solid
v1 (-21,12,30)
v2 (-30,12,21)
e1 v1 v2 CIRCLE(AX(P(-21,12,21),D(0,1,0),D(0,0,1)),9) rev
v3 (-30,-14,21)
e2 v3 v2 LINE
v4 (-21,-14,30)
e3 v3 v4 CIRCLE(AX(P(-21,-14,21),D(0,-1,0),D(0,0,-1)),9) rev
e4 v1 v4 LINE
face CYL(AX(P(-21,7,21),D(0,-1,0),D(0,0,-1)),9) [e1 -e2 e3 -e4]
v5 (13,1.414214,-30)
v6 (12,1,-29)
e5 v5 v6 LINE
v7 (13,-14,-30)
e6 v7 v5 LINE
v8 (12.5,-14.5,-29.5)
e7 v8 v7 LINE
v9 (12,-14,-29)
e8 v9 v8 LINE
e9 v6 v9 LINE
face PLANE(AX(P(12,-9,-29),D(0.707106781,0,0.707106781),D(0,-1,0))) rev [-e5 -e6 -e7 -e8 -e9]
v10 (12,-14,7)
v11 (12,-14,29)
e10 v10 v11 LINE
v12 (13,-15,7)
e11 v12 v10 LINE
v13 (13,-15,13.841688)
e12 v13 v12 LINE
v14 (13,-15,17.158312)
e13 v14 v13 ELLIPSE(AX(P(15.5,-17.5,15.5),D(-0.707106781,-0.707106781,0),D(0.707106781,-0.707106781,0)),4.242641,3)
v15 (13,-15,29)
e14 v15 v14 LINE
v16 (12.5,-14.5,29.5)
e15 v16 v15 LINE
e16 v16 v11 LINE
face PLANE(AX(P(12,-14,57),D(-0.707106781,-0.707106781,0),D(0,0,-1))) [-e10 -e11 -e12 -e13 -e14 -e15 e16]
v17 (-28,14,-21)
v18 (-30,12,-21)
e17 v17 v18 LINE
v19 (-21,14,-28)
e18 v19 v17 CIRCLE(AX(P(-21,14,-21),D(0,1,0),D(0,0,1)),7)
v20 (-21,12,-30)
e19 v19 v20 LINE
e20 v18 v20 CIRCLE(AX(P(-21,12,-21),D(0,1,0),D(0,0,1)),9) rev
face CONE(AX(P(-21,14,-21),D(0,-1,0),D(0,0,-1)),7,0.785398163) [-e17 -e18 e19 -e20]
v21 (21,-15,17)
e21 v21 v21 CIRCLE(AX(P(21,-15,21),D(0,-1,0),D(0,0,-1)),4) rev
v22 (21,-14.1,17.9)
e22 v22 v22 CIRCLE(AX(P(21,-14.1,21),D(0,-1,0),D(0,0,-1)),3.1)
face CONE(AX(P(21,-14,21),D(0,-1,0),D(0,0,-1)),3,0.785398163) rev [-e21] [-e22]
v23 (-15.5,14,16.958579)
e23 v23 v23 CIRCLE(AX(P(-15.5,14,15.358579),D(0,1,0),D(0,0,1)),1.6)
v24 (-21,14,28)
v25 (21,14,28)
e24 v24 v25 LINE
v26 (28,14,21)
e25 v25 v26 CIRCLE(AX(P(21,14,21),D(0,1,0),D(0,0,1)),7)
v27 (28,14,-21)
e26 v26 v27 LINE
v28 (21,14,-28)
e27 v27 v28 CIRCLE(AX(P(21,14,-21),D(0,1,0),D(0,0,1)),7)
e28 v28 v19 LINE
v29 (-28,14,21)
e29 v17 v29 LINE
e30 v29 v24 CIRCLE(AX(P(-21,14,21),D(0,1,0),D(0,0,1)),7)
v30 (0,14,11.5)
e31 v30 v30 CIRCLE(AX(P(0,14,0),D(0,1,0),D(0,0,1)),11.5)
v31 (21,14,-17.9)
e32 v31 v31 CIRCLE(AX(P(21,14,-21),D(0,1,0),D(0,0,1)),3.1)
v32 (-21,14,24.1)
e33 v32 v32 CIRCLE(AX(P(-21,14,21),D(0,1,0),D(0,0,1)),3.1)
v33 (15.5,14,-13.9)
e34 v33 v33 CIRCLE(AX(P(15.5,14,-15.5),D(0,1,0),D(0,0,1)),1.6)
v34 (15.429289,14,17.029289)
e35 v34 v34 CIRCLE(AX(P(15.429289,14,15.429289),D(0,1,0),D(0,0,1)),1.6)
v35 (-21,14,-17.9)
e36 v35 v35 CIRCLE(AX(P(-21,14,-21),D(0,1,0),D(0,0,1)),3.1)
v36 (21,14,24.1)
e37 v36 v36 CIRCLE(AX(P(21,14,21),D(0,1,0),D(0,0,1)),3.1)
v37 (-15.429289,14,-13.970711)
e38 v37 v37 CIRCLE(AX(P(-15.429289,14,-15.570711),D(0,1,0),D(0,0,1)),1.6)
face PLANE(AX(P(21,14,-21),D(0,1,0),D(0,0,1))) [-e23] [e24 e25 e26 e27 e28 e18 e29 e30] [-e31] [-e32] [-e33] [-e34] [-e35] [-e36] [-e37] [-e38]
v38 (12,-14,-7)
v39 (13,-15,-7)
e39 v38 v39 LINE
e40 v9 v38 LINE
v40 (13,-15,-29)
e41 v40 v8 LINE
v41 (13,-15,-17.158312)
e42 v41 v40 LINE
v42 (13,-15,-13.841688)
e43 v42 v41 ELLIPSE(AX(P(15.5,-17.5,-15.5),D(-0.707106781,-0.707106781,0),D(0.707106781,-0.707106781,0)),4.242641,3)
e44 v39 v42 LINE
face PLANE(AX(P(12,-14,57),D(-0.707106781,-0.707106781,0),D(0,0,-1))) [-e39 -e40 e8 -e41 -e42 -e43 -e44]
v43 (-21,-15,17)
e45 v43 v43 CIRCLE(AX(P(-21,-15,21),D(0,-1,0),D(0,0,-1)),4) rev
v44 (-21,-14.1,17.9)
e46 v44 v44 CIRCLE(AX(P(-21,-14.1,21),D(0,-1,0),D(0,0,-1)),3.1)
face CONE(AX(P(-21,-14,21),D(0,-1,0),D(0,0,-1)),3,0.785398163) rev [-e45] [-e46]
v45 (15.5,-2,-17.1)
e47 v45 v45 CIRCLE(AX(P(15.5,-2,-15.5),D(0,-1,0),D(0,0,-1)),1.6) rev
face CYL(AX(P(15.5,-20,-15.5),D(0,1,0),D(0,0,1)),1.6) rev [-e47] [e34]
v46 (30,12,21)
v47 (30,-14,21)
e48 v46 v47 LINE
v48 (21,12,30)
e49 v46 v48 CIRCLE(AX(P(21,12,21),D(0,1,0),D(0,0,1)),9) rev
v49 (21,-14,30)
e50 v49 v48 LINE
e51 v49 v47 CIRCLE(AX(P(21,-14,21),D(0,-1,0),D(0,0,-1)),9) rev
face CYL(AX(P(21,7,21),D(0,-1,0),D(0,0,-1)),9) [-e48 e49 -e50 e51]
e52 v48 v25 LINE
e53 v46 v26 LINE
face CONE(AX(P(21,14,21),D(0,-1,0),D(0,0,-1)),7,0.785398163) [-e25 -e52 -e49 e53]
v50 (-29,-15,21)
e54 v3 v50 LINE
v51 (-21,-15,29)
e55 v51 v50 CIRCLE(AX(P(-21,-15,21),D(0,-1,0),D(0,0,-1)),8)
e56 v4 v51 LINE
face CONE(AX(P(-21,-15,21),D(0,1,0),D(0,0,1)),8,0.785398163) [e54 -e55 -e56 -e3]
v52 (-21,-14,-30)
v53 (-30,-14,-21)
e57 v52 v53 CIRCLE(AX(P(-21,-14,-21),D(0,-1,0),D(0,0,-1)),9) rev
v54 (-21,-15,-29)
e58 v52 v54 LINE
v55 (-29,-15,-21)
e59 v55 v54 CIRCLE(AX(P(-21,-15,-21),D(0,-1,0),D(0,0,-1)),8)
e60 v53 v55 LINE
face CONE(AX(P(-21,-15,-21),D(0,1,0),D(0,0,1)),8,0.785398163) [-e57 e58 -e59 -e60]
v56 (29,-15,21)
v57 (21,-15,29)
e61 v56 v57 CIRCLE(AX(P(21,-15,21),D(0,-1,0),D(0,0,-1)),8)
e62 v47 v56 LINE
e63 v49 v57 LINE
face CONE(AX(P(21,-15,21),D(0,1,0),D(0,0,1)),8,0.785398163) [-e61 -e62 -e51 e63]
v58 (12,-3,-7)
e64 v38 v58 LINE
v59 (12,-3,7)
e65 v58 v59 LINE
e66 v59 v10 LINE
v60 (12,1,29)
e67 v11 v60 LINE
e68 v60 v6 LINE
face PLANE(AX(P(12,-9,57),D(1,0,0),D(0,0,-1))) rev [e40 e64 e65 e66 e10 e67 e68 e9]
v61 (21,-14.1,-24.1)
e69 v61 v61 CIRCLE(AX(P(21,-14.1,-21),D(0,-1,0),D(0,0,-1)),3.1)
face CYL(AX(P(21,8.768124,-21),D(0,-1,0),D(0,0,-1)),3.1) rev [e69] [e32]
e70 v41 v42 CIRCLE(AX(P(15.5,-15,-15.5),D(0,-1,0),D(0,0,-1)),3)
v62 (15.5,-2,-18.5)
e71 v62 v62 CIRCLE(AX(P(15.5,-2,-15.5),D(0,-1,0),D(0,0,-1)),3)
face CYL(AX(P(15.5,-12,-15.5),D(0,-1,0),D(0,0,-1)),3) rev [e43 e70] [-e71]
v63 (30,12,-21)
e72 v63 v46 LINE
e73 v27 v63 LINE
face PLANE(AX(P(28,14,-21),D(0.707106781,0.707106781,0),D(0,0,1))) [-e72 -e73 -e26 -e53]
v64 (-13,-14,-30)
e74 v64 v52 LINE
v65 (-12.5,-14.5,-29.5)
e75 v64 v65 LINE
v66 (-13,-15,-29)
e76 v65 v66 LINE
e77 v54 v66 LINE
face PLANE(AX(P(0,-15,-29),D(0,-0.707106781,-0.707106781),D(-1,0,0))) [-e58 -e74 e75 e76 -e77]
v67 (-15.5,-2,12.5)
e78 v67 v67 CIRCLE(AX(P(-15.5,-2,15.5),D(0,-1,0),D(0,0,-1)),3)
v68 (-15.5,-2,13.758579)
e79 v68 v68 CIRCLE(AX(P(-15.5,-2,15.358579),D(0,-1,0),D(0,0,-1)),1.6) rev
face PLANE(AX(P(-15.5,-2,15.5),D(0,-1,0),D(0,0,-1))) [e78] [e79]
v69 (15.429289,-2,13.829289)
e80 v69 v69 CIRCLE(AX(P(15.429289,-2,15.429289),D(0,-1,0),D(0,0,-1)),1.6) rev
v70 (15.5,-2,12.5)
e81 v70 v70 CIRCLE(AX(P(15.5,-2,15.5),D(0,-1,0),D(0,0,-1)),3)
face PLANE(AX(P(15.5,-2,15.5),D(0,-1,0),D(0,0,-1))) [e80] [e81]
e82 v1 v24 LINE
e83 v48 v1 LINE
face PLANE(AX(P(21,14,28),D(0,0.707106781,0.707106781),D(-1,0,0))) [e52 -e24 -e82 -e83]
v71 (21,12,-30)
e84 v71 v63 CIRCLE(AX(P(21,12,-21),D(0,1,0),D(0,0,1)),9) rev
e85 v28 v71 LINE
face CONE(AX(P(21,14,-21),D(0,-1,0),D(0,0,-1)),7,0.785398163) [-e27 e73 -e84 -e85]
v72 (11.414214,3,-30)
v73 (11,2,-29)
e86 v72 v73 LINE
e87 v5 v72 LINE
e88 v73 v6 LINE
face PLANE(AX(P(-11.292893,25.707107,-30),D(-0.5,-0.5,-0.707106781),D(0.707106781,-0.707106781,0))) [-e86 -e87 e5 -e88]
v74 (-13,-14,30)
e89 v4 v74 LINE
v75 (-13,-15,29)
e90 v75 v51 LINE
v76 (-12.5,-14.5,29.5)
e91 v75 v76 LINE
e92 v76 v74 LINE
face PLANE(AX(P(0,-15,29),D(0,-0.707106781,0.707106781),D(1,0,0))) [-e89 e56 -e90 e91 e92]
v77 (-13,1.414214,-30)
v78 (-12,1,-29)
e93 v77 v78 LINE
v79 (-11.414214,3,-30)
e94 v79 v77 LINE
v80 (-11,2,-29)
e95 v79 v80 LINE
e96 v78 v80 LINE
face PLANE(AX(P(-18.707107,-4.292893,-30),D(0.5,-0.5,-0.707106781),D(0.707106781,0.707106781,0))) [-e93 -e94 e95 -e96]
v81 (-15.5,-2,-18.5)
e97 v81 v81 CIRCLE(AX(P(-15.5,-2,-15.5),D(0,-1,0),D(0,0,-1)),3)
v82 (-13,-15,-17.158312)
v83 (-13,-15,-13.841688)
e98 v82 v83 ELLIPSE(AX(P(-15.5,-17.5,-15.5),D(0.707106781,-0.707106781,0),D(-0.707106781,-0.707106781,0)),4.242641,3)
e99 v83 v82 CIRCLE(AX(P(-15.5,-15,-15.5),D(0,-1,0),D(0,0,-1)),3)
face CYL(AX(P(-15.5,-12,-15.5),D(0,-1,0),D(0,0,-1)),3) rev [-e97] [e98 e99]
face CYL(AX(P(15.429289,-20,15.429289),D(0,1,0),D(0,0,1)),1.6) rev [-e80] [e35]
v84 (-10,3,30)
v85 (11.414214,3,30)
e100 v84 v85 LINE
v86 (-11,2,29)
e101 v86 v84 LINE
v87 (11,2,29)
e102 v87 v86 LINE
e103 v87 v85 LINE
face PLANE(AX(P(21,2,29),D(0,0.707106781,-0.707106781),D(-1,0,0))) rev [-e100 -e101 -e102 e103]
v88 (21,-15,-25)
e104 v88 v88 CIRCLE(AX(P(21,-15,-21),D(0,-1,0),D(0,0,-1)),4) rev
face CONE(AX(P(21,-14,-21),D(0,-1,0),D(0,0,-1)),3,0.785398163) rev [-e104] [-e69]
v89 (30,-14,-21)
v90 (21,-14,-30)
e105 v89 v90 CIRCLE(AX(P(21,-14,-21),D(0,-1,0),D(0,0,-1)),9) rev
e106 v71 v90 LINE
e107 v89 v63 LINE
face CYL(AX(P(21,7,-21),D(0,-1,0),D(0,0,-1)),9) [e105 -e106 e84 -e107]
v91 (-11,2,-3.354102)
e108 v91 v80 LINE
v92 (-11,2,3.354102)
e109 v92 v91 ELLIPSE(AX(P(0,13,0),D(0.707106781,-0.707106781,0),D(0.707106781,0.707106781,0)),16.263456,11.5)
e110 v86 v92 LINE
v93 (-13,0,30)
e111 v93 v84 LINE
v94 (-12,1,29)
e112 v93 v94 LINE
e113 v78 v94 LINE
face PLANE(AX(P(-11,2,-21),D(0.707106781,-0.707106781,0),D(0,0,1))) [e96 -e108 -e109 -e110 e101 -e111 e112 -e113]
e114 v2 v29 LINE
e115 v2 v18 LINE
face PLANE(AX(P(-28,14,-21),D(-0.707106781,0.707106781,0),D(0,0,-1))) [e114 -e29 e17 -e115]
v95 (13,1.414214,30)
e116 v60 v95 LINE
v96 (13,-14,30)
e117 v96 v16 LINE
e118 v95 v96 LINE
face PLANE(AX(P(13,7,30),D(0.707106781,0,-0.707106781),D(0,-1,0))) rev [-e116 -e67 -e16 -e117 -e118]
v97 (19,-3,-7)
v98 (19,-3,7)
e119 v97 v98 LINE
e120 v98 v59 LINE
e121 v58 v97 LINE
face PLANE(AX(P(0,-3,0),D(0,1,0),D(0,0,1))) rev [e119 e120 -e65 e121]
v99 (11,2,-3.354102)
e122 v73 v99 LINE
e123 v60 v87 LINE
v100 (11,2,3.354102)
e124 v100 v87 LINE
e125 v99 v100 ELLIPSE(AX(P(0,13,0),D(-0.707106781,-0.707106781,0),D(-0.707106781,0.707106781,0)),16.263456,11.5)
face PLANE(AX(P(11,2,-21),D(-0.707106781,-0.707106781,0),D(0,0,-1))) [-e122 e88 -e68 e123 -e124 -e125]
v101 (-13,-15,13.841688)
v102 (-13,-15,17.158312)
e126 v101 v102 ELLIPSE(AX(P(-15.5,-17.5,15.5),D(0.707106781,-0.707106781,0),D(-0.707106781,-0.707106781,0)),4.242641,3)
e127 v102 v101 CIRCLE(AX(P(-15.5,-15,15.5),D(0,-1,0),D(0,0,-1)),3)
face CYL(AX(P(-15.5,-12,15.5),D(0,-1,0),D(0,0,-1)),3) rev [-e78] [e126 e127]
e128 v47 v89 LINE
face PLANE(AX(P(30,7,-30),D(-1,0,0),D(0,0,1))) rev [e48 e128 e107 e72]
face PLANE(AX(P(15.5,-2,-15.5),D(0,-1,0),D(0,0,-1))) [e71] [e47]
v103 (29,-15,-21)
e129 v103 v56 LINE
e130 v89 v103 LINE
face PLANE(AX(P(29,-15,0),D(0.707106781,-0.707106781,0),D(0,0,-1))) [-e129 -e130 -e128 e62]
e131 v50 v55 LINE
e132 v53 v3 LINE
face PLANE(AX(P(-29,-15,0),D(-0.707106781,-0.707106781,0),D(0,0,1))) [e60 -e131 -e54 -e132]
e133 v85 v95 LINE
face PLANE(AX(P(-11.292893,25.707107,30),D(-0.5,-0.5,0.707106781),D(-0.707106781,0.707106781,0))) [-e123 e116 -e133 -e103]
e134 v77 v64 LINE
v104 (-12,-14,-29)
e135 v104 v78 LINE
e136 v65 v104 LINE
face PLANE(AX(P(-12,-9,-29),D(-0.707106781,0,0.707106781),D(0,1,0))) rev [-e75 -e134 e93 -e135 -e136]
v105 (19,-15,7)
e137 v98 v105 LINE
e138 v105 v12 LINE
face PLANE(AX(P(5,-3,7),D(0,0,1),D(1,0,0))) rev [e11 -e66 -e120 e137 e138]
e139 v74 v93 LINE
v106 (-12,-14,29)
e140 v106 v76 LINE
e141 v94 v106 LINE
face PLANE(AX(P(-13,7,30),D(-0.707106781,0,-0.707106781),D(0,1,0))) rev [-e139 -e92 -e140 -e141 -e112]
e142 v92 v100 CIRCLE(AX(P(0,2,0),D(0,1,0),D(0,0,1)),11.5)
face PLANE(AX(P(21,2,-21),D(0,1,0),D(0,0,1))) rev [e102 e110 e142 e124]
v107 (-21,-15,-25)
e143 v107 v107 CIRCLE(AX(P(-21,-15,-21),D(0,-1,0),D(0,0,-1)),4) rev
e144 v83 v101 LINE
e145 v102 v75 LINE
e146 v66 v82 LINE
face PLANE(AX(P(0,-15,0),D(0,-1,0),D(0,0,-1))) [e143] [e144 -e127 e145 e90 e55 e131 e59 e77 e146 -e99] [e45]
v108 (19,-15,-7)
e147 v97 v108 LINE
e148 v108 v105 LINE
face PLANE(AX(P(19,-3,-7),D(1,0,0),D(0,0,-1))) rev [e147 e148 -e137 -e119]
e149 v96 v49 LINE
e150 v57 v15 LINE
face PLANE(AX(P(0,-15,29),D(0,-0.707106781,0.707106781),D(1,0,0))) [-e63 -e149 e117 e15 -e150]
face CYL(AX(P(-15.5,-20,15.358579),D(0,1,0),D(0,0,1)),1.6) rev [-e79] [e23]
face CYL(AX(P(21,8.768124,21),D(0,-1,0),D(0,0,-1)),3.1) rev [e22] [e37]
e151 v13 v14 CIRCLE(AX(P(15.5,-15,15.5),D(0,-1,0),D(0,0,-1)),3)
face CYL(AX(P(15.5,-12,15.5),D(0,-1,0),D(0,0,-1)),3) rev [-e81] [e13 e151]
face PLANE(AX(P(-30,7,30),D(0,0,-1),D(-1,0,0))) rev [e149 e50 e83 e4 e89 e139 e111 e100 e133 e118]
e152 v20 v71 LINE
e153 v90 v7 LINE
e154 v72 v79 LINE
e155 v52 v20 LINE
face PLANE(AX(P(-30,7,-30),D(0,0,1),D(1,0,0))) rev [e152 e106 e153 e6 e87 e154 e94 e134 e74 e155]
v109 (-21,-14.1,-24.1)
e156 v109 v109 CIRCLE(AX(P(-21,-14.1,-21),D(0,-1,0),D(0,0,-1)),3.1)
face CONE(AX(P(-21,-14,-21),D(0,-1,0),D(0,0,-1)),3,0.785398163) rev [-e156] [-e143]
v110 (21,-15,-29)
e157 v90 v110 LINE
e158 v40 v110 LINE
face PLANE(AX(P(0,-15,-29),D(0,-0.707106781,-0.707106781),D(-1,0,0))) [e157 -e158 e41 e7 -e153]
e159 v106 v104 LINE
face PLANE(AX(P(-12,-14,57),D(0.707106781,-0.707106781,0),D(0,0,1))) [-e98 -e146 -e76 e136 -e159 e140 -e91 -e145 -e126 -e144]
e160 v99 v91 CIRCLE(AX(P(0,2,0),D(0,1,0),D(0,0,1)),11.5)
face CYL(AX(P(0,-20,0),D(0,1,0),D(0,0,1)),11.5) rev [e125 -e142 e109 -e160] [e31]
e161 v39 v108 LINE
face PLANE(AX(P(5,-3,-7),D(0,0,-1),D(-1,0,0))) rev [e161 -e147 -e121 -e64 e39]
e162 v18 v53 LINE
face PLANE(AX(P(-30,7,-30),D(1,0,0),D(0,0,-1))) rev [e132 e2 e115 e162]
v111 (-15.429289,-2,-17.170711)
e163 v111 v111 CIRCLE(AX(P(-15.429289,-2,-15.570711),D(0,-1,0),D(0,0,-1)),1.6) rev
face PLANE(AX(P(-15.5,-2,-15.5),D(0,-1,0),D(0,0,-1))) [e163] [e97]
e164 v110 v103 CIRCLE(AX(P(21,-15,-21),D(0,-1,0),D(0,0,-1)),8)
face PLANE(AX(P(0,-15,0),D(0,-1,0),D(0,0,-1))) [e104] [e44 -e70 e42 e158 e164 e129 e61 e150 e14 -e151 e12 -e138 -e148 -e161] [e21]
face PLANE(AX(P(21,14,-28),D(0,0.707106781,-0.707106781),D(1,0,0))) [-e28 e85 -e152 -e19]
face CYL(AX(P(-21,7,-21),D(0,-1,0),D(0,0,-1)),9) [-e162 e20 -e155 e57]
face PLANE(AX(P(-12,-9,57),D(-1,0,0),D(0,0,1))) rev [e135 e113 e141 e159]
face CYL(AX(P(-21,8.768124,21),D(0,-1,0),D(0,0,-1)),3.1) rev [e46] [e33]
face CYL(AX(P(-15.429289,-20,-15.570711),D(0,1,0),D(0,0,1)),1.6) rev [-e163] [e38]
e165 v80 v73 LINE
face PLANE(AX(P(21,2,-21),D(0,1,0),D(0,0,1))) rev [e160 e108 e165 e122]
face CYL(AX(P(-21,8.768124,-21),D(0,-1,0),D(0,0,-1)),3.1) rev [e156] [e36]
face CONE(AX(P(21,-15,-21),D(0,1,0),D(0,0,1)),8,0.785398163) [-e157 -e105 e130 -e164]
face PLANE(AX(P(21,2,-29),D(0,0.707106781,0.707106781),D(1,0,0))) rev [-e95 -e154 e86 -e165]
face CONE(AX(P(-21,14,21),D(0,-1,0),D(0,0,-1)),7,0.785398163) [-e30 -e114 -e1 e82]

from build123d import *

# Parameters (mm, degrees)
SKETCH_1_W           = 60
SKETCH_1_H           = 60
EXTRUDE_1_DEPTH      = 7
SKETCH_2_W           = 18
SKETCH_2_H           = 60
SKETCH_2_R           = 3
EXTRUDE_2_DEPTH      = 15
SKETCH_3_W           = 43
SKETCH_3_H           = 70
CUT_EXTRUDE_1_DEPTH  = 7
SKETCH_4_W           = 24
SKETCH_4_H           = 60
EXTRUDE_3_DEPTH      = 15
SKETCH_12_W          = 24
SKETCH_12_H          = 12
CUT_EXTRUDE_8_DEPTH  = 87
FILLET_START         = -16
FILLET_8_DEPTH       = 24
CHAMFER_23_SIZE      = 1
CHAMFER_24_SIZE      = 1
EXTRUDE_4_DEPTH      = 7
EXTRUDE_5_DEPTH      = 7
SKETCH_23_W          = 24
SKETCH_23_H          = 60
CUT_EXTRUDE_9_DEPTH  = 11
SKETCH_24_R          = 11.5
SKETCH_24_R_2        = 1.6
CUT_EXTRUDE_10_DEPTH = 34
SKETCH_25_R          = 3
CUT_EXTRUDE_11_DEPTH = 3
CHAMFER_25_SIZE      = 2
CHAMFER_26_SIZE      = 1
CHAMFER_27_SIZE      = 1
CHAMFER_28_SIZE      = 1
SKETCH_26_W          = 14
SKETCH_26_H          = 14
CUT_EXTRUDE_12_DEPTH = 12
SKETCH_28_R          = 3.1
CUT_EXTRUDE_13_DEPTH = 15
SKETCH_30_R          = 3
CUT_EXTRUDE_14_DEPTH = 10
SKETCH_31_R          = 3.1
CUT_EXTRUDE_15_DEPTH = 35


with BuildPart() as part:
    # 草图1 → 凸台-拉伸1 (new body)
    with BuildSketch(Plane(origin=(0, 0, 0), x_dir=(1, 0, 0), z_dir=(0, 1, 0))):
        Rectangle(SKETCH_1_W, SKETCH_1_H)
    extrude(amount=EXTRUDE_1_DEPTH)

    # 草图2 → 凸台-拉伸2 (add)
    # profile 1 of 2: a face of its own
    with BuildSketch(Plane.XZ):
        with Locations((-21, 0)):
            Rectangle(SKETCH_2_W, SKETCH_2_H)
        with Locations(Location((-21, 21, 0), (0, 0, 270))):
            Circle(SKETCH_2_R, mode=Mode.SUBTRACT)
        with Locations(Location((-21, -21, 0), (0, 0, 270))):
            Circle(SKETCH_2_R, mode=Mode.SUBTRACT)
    # profile 2 of 2: a face of its own
    with BuildSketch(Plane.XZ):
        with Locations((21, 0)):
            Rectangle(SKETCH_2_W, SKETCH_2_H)
        with Locations(Location((21, -21, 0), (0, 0, 90))):
            Circle(SKETCH_2_R, mode=Mode.SUBTRACT)
        with Locations(Location((21, 21, 0), (0, 0, 90))):
            Circle(SKETCH_2_R, mode=Mode.SUBTRACT)
    extrude(amount=EXTRUDE_2_DEPTH)

    # 草图3 → 切除-拉伸1 (cut)
    with BuildSketch(Plane(origin=(0, 7, 0), x_dir=(1, 0, 0), z_dir=(0, 1, 0))):
        with Locations((0, 30)):
            Rectangle(SKETCH_3_W, SKETCH_3_H)
    extrude(amount=-CUT_EXTRUDE_1_DEPTH, mode=Mode.SUBTRACT)

    # 草图4 → 凸台-拉伸3 (add)
    with BuildSketch(Plane.XZ):
        Rectangle(SKETCH_4_W, SKETCH_4_H)
    extrude(amount=EXTRUDE_3_DEPTH)

    # 草图12 → 切除-拉伸8 (cut)
    with BuildSketch(Plane(origin=(0, 0, -30), x_dir=(-1, 0, 0), z_dir=(0, 0, -1))):
        with Locations((0, -15)):
            Rectangle(SKETCH_12_W, SKETCH_12_H)
    extrude(amount=-CUT_EXTRUDE_8_DEPTH, mode=Mode.SUBTRACT)

    # 圆角8: read off the stored shape, not the designer's step
    # 圆角8 outline → 圆角8 (cut)
    with BuildSketch(Plane(origin=(0, 0, 0), x_dir=(1, 0, 0), z_dir=(0, 1, 0)).offset(FILLET_START)):
        with BuildLine():
            Line((-30, 30), (-30, 21))
            ThreePointArc((-30, 21), (-27.363961031, 27.363961031), (-21, 30))
            Line((-21, 30), (-30, 30))
        make_face()
        with BuildLine():
            ThreePointArc((-21, -30), (-27.363961031, -27.363961031), (-30, -21))
            Line((-30, -21), (-30, -30))
            Line((-30, -30), (-21, -30))
        make_face()
        with BuildLine():
            Line((30, 30), (21, 30))
            ThreePointArc((21, 30), (27.363961031, 27.363961031), (30, 21))
            Line((30, 21), (30, 30))
        make_face()
        with BuildLine():
            ThreePointArc((30, -21), (27.363961031, -27.363961031), (21, -30))
            Line((21, -30), (30, -30))
            Line((30, -30), (30, -21))
        make_face()
    extrude(amount=FILLET_8_DEPTH, mode=Mode.SUBTRACT)

    # 倒角23
    chamfer_23_edges = [part.edges().sort_by_distance(p)[0] for p in [
        (-21, -15, 24),
        (-21, -15, -18),
        (21, -15, -24),
        (21, -15, 18),
    ]]
    chamfer(chamfer_23_edges, length=CHAMFER_23_SIZE)

    # 倒角24
    chamfer_24_edges = [part.edges().sort_by_distance(p)[0] for p in [
        (-30, -15, 0),
        (-16.5, -15, -30),
        (-27.363961031, -15, 27.363961031),
        (-27.363961031, -15, -27.363961031),
        (30, -15, 0),
        (16.5, -15, 30),
        (27.363961031, -15, 27.363961031),
        (27.363961031, -15, -27.363961031),
        (16.5, -15, -30),
        (-16.5, -15, 30),
    ]]
    chamfer(chamfer_24_edges, length=CHAMFER_24_SIZE)

    # 草图21 → 凸台-拉伸4 (add)
    with BuildSketch(Plane(origin=(0, 0, 0), x_dir=(1, 0, 0), z_dir=(0, 1, 0))):
        with BuildLine():
            Line((-21.5, 23.958039892), (-21.5, 18.041960108))
            Line((-21.5, 18.041960108), (-21.5, -5))
            Line((-21.5, -5), (21.5, -5))
            Line((21.5, -5), (21.5, 18.041960108))
            Line((21.5, 18.041960108), (21.5, 23.958039892))
            Line((21.5, 23.958039892), (21.5, 29.986100378))
            ThreePointArc((21.5, 29.986100378), (21.250096581, 29.996524423), (21, 30))
            Line((21, 30), (-21, 30))
            ThreePointArc((-21, 30), (-21.250096581, 29.996524423), (-21.5, 29.986100378))
            Line((-21.5, 29.986100378), (-21.5, 23.958039892))
        make_face()
    extrude(amount=EXTRUDE_4_DEPTH)

    # 草图22 → 凸台-拉伸5 (add)
    with BuildSketch(Plane(origin=(0, 7, 0), x_dir=(1, 0, 0), z_dir=(0, 1, 0))):
        with BuildLine():
            Line((21, 30), (-21, 30))
            ThreePointArc((-21, 30), (-27.363961031, 27.363961031), (-30, 21))
            Line((-30, 21), (-30, -21))
            ThreePointArc((-30, -21), (-27.363961031, -27.363961031), (-21, -30))
            Line((-21, -30), (21, -30))
            ThreePointArc((21, -30), (27.363961031, -27.363961031), (30, -21))
            Line((30, -21), (30, 21))
            ThreePointArc((30, 21), (27.363961031, 27.363961031), (21, 30))
        make_face()
    extrude(amount=EXTRUDE_5_DEPTH)

    # 草图23 → 切除-拉伸9 (cut)
    with BuildSketch(Plane.XZ.offset(9)):
        Rectangle(SKETCH_23_W, SKETCH_23_H)
    extrude(amount=-CUT_EXTRUDE_9_DEPTH, mode=Mode.SUBTRACT)

    # 草图24 → 切除-拉伸10 (cut)
    with BuildSketch(Plane(origin=(0, 14, 0), x_dir=(1, 0, 0), z_dir=(0, 1, 0))):
        with Locations(Location((0, 0, 0), (0, 0, 270))):
            Circle(SKETCH_24_R)
        with Locations(Location((15.5, 15.5, 0), (0, 0, 270))):
            Circle(SKETCH_24_R_2)
        with Locations(Location((15.429289322, -15.429289322, 0), (0, 0, 270))):
            Circle(SKETCH_24_R_2)
        with Locations(Location((-15.5, -15.358578644, 0), (0, 0, 270))):
            Circle(SKETCH_24_R_2)
        with Locations(Location((-15.429289322, 15.570710678, 0), (0, 0, 270))):
            Circle(SKETCH_24_R_2)
    extrude(amount=-CUT_EXTRUDE_10_DEPTH, mode=Mode.SUBTRACT)

    # 草图25 → 切除-拉伸11 (cut)
    with BuildSketch(Plane.XZ.offset(15)):
        with Locations(Location((15.5, -15.5, 0), (0, 0, 270))):
            Circle(SKETCH_25_R)
        with Locations(Location((-15.5, -15.5, 0), (0, 0, 270))):
            Circle(SKETCH_25_R)
        with Locations(Location((-15.5, 15.5, 0), (0, 0, 270))):
            Circle(SKETCH_25_R)
        with Locations(Location((15.5, 15.5, 0), (0, 0, 270))):
            Circle(SKETCH_25_R)
    extrude(amount=-CUT_EXTRUDE_11_DEPTH, mode=Mode.SUBTRACT)

    # 倒角25
    chamfer_25_edges = [part.edges().sort_by_distance(p)[0] for p in [
        (27.363961031, 14, -27.363961031),
        (0, 14, -30),
        (-27.363961031, 14, -27.363961031),
        (-30, 14, 0),
        (-27.363961031, 14, 27.363961031),
        (0, 14, 30),
        (27.363961031, 14, 27.363961031),
        (30, 14, 0),
    ]]
    chamfer(chamfer_25_edges, length=CHAMFER_25_SIZE)

    # 倒角26
    # the kernel refuses this chamfer: 1 mm, written as the material it adds along each edge
    with BuildSketch(Plane(origin=(12, 2, -30), x_dir=(0, -1, 0), z_dir=(0, 0, 1))) as chamfer_26_piece_1_section:
        Polygon((CHAMFER_26_SIZE, 0), (0, -CHAMFER_26_SIZE), (0, 0), align=None)
    chamfer_26_piece_1 = extrude(amount=60, mode=Mode.PRIVATE)
    chamfer_26_piece_1 = chamfer_26_piece_1 - Plane(origin=(0, 2, 0), x_dir=(0, 0, 1), z_dir=(0, 1, 0)) * Cylinder(11.5, 124, mode=Mode.PRIVATE)
    add(chamfer_26_piece_1)
    with BuildSketch(Plane(origin=(-12, 2, 30), x_dir=(1, 0, 0), z_dir=(0, 0, -1))) as chamfer_26_piece_2_section:
        Polygon((CHAMFER_26_SIZE, 0), (0, CHAMFER_26_SIZE), (0, 0), align=None)
    chamfer_26_piece_2 = extrude(amount=60, mode=Mode.PRIVATE)
    chamfer_26_piece_2 = chamfer_26_piece_2 - Plane(origin=(0, 2, 0), x_dir=(0, 0, 1), z_dir=(0, 1, 0)) * Cylinder(11.5, 124, mode=Mode.PRIVATE)
    add(chamfer_26_piece_2)
    # the kernel refuses this chamfer: 1 mm, written as the material it takes off along each edge
    with BuildSketch(Plane(origin=(-12, -15, 31.571682988), x_dir=(-1, 0, 0), z_dir=(0, 0, -1)), Plane(origin=(12, -15, -31.571682988), x_dir=(1, 0, 0), z_dir=(0, 0, 1))) as chamfer_26_2_piece_1:
        Polygon((CHAMFER_26_SIZE, 0), (0, CHAMFER_26_SIZE), (0, 0), align=None)
    extrude(amount=63.143365976, mode=Mode.SUBTRACT)

    # 倒角27
    chamfer_27_edges = [part.edges().sort_by_distance(p)[0] for p in [
        (-12, -6.5, -30),
        (0, 2, -30),
        (12, -6.5, -30),
        (11.5, 1.5, -30),
        (-11.5, 1.5, -30),
    ]]
    chamfer(chamfer_27_edges, length=CHAMFER_27_SIZE)

    # 倒角28
    chamfer_28_edges = [part.edges().sort_by_distance(p)[0] for p in [
        (-12, -6.5, 30),
        (0, 2, 30),
        (12, -6.5, 30),
        (11.5, 1.5, 30),
    ]]
    chamfer(chamfer_28_edges, length=CHAMFER_28_SIZE)

    # 草图26 → 切除-拉伸12 (cut)
    with BuildSketch(Plane.XZ.offset(15)):
        with Locations((12, 0)):
            Rectangle(SKETCH_26_W, SKETCH_26_H)
    extrude(amount=-CUT_EXTRUDE_12_DEPTH, mode=Mode.SUBTRACT)

    # 草图28 → 切除-拉伸13 (cut)
    with BuildSketch(Plane.XZ.offset(15)):
        with Locations(Location((-21, 21, 0), (0, 0, 270))):
            Circle(SKETCH_28_R)
        with Locations(Location((21, 21, 0), (0, 0, 270))):
            Circle(SKETCH_28_R)
        with Locations(Location((21, -21, 0), (0, 0, 270))):
            Circle(SKETCH_28_R)
        with Locations(Location((-21, -21, 0), (0, 0, 270))):
            Circle(SKETCH_28_R)
    extrude(amount=-CUT_EXTRUDE_13_DEPTH, mode=Mode.SUBTRACT)

    # 草图30 → 切除-拉伸14 (cut)
    with BuildSketch(Plane.XZ.offset(12)):
        with Locations(Location((-15.5, 15.5, 0), (0, 0, 270))):
            Circle(SKETCH_30_R)
        with Locations(Location((15.5, 15.5, 0), (0, 0, 270))):
            Circle(SKETCH_30_R)
        with Locations(Location((15.5, -15.5, 0), (0, 0, 270))):
            Circle(SKETCH_30_R)
        with Locations(Location((-15.5, -15.5, 0), (0, 0, 270))):
            Circle(SKETCH_30_R)
    extrude(amount=-CUT_EXTRUDE_14_DEPTH, mode=Mode.SUBTRACT)

    # 草图31 → 切除-拉伸15 (cut)
    with BuildSketch(Plane.XZ):
        with Locations(Location((-21, 21, 0), (0, 0, 270))):
            Circle(SKETCH_31_R)
        with Locations(Location((21, 21, 0), (0, 0, 270))):
            Circle(SKETCH_31_R)
        with Locations(Location((21, -21, 0), (0, 0, 270))):
            Circle(SKETCH_31_R)
        with Locations(Location((-21, -21, 0), (0, 0, 270))):
            Circle(SKETCH_31_R)
    extrude(amount=-CUT_EXTRUDE_15_DEPTH, mode=Mode.SUBTRACT)


solid = part.part
